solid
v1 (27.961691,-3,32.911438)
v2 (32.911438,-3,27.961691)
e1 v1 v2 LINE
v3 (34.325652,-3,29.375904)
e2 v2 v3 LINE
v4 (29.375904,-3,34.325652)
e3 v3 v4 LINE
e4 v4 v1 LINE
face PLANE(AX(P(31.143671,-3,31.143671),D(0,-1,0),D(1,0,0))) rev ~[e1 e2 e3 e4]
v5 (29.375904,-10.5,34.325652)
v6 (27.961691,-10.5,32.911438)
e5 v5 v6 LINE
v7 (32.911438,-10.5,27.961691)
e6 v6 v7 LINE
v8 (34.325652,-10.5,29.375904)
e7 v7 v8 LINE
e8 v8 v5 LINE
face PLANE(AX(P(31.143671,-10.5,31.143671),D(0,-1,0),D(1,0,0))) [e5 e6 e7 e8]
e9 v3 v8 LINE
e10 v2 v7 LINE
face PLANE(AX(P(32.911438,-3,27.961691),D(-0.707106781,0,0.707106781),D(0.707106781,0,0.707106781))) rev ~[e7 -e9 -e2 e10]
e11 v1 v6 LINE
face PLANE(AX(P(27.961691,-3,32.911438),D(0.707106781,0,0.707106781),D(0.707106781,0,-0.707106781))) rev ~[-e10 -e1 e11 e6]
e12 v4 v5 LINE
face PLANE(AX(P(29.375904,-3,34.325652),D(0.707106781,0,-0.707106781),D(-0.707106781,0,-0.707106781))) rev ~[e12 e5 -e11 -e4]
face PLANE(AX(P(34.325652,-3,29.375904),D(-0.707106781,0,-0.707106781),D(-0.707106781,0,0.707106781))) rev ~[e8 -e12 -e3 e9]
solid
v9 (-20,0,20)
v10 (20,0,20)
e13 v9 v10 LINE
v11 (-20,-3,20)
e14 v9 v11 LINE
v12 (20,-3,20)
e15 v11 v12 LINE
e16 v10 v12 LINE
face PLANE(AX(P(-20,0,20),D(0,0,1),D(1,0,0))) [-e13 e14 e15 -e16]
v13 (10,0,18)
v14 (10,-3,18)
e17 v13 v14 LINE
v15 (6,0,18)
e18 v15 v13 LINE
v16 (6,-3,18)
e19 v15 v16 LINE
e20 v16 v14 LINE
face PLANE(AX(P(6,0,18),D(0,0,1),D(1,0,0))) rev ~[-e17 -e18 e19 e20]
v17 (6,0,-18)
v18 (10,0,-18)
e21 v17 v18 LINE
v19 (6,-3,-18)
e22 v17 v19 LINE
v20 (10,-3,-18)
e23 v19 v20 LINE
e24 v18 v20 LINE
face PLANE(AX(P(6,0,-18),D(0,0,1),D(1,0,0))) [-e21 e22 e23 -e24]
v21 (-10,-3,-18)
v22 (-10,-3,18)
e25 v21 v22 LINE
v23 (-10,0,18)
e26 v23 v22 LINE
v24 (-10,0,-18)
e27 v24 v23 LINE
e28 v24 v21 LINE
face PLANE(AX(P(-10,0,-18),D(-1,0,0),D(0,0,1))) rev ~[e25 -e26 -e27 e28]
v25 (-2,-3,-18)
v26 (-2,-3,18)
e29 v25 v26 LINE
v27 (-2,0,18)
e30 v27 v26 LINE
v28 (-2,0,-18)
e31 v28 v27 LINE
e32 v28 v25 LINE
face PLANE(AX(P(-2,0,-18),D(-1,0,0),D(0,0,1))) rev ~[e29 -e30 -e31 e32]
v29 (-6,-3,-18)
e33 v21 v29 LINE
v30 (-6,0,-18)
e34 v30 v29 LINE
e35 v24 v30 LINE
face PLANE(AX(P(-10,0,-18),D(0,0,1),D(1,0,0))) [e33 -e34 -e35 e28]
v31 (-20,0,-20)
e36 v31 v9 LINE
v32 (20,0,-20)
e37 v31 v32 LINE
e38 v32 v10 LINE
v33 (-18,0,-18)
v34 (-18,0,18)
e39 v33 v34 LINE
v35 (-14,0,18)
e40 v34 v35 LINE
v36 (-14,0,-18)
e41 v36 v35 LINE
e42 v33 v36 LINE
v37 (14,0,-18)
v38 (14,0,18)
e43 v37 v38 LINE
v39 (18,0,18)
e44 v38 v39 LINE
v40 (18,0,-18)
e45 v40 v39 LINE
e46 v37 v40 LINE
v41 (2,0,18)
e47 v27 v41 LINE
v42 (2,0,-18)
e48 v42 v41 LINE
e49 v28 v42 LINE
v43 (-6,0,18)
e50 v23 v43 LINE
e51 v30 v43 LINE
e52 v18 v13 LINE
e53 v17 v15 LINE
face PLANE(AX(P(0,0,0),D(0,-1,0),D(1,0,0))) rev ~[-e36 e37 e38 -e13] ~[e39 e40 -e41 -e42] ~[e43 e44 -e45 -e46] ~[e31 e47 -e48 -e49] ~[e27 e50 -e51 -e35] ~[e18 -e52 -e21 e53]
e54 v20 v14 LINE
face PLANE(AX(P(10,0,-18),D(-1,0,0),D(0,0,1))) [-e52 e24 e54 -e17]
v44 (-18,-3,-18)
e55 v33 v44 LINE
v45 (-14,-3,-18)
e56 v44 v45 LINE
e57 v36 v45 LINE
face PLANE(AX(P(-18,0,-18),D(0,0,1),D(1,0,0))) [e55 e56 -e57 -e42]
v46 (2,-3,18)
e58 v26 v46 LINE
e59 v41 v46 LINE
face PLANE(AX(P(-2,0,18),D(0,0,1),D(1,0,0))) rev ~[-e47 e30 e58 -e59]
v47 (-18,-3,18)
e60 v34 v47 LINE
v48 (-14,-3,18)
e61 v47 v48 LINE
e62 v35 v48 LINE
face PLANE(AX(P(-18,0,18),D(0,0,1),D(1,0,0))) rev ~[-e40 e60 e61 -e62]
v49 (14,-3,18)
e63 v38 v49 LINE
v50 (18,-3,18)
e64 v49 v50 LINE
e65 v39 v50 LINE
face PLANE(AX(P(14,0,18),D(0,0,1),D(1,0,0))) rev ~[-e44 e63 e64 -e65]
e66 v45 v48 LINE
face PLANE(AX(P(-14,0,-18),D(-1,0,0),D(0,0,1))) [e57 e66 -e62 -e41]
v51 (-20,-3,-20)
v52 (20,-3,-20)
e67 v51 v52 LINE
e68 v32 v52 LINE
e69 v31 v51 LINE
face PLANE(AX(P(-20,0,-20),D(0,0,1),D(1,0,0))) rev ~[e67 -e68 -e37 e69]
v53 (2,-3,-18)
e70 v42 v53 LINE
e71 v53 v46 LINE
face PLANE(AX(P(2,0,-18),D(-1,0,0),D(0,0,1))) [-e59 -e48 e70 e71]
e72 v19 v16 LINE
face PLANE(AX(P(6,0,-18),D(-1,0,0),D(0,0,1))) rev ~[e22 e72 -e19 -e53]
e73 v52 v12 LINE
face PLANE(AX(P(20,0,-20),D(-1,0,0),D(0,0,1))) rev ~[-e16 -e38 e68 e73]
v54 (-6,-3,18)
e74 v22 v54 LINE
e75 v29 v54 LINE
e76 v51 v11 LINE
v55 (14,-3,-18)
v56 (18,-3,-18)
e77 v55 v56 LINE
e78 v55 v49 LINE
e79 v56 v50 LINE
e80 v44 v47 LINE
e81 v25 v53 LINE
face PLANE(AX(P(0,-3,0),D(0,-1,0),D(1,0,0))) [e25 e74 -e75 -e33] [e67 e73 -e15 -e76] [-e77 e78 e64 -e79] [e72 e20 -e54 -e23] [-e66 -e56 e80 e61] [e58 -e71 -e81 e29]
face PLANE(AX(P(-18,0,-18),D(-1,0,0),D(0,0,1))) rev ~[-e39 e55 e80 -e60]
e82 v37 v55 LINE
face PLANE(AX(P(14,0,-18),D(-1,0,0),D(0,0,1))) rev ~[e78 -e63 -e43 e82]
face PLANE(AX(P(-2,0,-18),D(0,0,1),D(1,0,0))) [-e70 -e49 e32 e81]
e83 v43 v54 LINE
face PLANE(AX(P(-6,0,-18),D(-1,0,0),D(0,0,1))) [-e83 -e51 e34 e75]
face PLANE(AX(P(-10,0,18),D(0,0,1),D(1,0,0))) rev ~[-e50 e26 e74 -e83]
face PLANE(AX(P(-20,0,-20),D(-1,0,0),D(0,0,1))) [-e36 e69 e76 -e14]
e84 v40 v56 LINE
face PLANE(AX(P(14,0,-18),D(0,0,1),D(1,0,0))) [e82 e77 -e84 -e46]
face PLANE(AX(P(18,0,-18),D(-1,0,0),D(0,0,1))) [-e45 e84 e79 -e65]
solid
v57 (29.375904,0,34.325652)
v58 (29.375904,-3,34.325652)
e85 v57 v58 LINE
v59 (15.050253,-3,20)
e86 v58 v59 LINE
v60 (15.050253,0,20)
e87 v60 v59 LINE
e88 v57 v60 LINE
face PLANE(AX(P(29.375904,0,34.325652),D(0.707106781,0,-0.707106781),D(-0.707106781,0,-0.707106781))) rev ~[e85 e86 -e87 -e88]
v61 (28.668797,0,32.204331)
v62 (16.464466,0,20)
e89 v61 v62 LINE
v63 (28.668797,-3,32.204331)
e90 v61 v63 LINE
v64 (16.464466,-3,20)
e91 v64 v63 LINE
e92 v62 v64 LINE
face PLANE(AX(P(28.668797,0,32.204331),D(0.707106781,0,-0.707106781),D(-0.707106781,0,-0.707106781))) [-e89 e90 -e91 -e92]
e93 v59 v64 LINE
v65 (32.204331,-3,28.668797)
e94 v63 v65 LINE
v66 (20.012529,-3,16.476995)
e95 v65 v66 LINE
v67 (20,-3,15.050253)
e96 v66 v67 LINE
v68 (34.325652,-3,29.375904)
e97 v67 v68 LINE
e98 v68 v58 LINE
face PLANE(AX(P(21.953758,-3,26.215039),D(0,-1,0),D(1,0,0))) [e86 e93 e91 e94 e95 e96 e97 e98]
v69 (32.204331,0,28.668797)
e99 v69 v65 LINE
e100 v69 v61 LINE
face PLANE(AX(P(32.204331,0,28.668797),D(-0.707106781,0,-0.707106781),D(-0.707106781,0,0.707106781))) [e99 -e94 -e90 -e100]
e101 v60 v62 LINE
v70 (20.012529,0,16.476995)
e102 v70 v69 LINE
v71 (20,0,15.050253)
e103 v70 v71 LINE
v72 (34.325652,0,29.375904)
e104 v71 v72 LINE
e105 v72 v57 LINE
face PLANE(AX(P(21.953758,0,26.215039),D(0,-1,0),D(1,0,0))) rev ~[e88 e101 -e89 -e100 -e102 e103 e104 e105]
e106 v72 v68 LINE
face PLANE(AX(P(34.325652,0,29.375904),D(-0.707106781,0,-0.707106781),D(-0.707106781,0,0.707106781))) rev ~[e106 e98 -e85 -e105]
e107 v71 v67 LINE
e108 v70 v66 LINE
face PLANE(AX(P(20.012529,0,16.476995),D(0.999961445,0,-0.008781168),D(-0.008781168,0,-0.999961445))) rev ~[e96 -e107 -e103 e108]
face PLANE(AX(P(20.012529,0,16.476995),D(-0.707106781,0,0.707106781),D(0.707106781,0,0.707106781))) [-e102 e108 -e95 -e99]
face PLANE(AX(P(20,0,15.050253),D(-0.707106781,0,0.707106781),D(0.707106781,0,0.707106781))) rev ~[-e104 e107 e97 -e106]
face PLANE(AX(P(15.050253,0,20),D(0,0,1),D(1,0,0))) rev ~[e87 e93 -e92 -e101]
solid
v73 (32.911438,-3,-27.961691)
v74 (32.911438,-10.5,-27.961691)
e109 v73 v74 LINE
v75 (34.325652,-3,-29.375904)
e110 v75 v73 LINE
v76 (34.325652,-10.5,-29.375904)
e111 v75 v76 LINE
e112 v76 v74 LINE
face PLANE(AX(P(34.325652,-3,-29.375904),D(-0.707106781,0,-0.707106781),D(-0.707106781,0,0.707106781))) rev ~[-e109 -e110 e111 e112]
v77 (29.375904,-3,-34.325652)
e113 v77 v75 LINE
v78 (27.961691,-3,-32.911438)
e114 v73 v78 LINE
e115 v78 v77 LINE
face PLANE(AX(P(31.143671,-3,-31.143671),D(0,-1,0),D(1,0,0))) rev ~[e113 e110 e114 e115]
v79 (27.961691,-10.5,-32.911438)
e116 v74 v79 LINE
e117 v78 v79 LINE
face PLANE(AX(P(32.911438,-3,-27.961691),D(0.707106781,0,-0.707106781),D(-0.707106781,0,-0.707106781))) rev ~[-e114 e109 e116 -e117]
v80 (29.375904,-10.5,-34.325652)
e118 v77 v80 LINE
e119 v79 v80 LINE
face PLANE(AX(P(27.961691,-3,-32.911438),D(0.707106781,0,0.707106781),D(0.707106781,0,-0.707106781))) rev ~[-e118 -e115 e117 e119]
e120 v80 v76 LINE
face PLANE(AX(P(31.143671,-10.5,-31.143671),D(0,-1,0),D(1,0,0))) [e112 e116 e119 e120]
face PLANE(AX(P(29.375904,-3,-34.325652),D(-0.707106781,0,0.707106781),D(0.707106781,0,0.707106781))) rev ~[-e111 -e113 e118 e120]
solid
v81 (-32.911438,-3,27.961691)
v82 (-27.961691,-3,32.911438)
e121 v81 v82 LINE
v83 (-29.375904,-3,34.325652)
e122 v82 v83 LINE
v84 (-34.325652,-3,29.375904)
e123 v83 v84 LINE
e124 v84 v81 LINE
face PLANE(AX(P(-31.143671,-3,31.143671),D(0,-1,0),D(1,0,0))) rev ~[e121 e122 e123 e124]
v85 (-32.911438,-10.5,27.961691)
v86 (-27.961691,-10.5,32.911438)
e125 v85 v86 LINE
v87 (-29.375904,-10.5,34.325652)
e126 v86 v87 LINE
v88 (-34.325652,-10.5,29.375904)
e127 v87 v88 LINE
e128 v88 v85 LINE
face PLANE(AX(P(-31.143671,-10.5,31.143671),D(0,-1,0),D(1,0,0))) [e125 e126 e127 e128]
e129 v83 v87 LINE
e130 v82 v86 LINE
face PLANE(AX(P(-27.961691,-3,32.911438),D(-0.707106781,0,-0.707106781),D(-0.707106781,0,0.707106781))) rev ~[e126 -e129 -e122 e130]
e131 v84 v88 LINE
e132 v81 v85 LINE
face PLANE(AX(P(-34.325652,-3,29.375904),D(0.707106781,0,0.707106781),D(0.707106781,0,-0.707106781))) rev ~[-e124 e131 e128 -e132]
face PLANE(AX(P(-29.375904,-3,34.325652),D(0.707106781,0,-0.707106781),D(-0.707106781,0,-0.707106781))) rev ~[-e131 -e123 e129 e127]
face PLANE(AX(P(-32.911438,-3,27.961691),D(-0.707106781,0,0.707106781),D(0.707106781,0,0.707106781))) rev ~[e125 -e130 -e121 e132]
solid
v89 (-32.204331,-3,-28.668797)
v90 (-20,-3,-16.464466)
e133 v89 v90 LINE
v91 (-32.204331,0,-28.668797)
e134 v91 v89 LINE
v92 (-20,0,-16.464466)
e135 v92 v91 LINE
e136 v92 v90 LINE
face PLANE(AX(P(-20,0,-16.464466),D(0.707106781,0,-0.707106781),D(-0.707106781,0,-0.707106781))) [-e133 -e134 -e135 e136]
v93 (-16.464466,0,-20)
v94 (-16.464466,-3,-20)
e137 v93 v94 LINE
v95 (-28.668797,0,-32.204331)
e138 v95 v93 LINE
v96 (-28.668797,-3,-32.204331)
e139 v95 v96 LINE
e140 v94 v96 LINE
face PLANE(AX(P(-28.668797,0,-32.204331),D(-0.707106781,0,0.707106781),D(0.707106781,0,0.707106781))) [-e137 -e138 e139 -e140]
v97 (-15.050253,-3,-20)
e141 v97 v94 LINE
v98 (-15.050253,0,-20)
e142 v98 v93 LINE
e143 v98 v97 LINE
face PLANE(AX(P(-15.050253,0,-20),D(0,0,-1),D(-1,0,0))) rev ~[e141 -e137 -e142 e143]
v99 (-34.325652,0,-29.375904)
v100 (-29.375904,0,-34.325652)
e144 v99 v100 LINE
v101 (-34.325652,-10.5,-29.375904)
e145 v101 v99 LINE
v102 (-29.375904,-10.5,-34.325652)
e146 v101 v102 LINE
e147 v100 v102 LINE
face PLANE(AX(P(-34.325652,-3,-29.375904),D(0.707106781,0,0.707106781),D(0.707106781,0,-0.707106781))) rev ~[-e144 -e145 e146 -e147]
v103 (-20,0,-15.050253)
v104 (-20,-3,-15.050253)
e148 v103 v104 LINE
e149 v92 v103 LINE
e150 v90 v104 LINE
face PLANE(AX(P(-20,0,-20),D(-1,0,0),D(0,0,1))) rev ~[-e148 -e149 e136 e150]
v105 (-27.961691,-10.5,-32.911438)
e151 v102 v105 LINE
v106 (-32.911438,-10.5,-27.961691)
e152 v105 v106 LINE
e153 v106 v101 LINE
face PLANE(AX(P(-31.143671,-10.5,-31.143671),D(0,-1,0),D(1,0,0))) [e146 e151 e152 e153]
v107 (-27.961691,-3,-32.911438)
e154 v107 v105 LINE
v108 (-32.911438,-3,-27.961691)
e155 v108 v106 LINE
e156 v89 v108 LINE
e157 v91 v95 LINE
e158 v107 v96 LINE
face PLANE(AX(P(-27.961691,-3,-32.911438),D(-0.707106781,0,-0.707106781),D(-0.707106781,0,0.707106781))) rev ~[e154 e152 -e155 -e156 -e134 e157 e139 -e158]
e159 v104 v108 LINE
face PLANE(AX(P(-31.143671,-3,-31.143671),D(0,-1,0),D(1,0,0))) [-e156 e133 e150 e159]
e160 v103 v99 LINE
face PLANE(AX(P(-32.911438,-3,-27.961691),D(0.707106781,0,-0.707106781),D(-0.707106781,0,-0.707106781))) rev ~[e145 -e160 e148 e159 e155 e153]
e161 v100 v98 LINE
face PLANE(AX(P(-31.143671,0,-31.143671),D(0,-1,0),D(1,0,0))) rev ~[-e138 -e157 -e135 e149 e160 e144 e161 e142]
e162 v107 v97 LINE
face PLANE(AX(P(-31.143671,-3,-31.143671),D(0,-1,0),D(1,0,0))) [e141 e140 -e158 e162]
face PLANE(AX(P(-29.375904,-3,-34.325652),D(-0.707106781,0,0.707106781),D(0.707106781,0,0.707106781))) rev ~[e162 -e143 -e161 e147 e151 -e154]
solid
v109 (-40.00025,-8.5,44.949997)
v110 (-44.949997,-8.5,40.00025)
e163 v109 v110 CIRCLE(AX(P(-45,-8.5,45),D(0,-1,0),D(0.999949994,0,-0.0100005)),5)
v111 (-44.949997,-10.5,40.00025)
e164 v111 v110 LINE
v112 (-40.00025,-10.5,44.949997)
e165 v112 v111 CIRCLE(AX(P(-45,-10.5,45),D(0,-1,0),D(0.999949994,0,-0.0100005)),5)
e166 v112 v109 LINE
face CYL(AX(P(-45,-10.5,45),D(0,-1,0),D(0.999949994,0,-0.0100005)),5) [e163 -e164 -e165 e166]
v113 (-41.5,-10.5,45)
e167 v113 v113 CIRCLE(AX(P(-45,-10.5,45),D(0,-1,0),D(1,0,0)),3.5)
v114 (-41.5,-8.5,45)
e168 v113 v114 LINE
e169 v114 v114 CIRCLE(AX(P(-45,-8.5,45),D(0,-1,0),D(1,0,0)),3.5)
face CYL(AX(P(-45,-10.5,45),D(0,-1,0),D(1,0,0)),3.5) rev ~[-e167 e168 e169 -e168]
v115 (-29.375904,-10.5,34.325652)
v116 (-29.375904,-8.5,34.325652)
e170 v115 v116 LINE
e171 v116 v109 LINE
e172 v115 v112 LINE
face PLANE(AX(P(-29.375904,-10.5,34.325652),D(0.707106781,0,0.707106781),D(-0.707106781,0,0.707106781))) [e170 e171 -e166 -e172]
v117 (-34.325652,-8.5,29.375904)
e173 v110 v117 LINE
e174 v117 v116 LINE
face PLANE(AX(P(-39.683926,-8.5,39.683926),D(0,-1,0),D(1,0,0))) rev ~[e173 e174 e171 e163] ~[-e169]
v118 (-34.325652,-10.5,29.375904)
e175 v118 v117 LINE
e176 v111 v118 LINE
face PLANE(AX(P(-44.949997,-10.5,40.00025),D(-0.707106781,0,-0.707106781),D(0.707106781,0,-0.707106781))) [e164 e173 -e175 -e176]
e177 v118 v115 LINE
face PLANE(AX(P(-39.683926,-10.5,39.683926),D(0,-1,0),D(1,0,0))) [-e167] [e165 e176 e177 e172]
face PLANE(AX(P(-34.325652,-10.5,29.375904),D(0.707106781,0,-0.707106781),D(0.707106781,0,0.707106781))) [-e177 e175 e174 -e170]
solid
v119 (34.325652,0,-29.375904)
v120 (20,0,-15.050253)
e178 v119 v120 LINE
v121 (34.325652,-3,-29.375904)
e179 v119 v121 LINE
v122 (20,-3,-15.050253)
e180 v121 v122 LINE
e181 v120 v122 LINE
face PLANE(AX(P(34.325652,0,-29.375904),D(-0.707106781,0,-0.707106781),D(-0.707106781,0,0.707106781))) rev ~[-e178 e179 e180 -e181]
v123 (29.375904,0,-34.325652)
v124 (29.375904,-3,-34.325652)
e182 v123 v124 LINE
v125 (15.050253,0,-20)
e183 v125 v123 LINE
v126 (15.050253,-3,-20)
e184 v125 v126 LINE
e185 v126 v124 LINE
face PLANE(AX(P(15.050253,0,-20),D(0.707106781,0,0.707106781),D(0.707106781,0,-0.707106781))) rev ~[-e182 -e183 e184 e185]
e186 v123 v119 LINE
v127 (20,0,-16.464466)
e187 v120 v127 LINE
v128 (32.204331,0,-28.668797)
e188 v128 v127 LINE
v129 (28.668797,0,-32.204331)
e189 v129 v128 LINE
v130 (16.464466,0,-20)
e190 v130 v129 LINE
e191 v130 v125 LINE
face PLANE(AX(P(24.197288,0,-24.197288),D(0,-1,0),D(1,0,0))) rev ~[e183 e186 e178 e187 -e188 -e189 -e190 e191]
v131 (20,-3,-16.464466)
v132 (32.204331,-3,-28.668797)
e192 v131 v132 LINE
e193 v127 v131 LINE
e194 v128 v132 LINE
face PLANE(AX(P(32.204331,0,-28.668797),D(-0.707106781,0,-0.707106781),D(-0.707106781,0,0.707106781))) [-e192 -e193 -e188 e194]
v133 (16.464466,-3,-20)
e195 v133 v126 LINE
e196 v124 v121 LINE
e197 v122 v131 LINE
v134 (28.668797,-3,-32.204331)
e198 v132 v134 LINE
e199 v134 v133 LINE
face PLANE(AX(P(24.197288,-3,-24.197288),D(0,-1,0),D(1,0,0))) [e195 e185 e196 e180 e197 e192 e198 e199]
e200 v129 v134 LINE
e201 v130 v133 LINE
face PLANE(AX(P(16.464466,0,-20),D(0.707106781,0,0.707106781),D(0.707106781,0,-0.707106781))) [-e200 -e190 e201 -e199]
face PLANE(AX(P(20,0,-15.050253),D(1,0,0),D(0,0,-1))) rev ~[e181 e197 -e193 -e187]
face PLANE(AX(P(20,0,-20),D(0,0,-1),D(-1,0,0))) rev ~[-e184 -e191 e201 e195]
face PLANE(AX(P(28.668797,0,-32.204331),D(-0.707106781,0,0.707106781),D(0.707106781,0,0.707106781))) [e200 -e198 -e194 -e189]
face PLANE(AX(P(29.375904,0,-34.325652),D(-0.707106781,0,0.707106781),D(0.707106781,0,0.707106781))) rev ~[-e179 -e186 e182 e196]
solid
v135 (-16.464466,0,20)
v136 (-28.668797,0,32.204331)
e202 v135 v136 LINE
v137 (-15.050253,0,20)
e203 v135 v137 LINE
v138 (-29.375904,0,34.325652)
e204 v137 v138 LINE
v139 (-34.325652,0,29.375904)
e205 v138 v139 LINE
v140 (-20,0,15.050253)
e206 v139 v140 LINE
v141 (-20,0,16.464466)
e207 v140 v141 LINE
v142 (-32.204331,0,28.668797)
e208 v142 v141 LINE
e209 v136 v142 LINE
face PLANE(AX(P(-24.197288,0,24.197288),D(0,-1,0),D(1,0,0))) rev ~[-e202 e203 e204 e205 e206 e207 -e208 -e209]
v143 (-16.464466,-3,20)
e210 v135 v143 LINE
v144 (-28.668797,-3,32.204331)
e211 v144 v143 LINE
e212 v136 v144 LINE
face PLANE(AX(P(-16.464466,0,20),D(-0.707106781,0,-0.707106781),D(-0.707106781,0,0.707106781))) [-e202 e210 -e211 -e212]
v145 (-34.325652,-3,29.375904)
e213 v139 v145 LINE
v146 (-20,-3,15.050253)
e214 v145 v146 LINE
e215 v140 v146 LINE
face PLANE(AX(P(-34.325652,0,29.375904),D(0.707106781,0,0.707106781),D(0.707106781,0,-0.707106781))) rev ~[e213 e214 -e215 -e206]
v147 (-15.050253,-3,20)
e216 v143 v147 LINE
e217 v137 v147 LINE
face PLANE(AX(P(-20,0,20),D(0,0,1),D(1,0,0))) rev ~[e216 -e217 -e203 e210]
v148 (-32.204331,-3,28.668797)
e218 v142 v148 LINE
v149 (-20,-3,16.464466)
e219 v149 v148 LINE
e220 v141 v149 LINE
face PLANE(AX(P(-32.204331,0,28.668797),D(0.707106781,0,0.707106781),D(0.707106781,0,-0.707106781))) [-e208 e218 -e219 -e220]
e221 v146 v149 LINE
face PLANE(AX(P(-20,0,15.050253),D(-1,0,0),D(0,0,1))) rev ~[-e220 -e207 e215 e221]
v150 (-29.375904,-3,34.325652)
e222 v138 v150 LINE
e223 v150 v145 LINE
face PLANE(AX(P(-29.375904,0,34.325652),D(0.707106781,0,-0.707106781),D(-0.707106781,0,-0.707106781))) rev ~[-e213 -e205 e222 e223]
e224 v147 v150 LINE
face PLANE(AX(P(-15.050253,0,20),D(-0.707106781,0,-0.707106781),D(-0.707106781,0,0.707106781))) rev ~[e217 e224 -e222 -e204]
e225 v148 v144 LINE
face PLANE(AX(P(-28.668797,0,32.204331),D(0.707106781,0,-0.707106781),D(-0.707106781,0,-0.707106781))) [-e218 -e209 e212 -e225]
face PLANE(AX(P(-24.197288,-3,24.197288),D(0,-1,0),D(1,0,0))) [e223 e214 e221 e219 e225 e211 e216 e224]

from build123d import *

# Parameters (mm, degrees)
F0_W      = 40
F0_H      = 40
F0_W_2    = 4
F0_H_2    = 36
F1_DEPTH  = 3
F3_DEPTH  = 3
F4_DEPTH  = 25
F5_DEPTH  = 25
F6_DEPTH  = 25
F7_DEPTH  = 25
F9_DEPTH  = 7.5
F10_R     = 3.5
F11_DEPTH = 2


# Not quite as in the source:
# - the program builds the solid bodies; features that only make, move or delete a surface that nothing else refers to are left out


with BuildPart() as f1:
    # F0 (on Front) → F1 (new body)
    with BuildSketch(Plane.XZ):
        Rectangle(F0_W, F0_H)
        with Locations((-16, 0)):
            Rectangle(F0_W_2, F0_H_2, mode=Mode.SUBTRACT)
        with Locations((-8, 0)):
            Rectangle(F0_W_2, F0_H_2, mode=Mode.SUBTRACT)
        Rectangle(F0_W_2, F0_H_2, mode=Mode.SUBTRACT)
        with Locations((8, 0)):
            Rectangle(F0_W_2, F0_H_2, mode=Mode.SUBTRACT)
        with Locations((16, 0)):
            Rectangle(F0_W_2, F0_H_2, mode=Mode.SUBTRACT)
    extrude(amount=F1_DEPTH)


with BuildPart() as f3:
    # F2 (on Front) → F3 (new body)
    with BuildSketch(Plane.XZ):
        Polygon((27.9616906966, 32.9114381649), (15.0502525317, 20), (16.4644660941, 20), (28.6687974778, 32.2043313837), align=None)
        Polygon((29.3759042589, 34.3256517272), (27.9616906966, 32.9114381649), (28.6687974778, 32.2043313837), (32.2043313837, 28.6687974778), (32.9114381649, 27.9616906966), (34.3256517272, 29.3759042589), align=None)
        Polygon((28.6687974778, 32.2043313837), (16.4644660941, 20), (20.0434662402, 20), (20.0125289488, 16.4769950429), (32.2043313837, 28.6687974778), align=None)
        Polygon((32.9114381649, 27.9616906966), (32.2043313837, 28.6687974778), (20.0125289488, 16.4769950429), (20, 15.0502525317), align=None)
    extrude(amount=F3_DEPTH)

    # F2 (on Front) → F4 (cut)
    with BuildSketch(Plane.XZ):
        Polygon((28.6687974778, 32.2043313837), (16.4644660941, 20), (20.0434662402, 20), (20.0125289488, 16.4769950429), (32.2043313837, 28.6687974778), align=None)
    extrude(amount=F4_DEPTH, mode=Mode.SUBTRACT)


with BuildPart() as f3b:
    # F2 (on Front) → F3, piece 2 (new body)
    with BuildSketch(Plane.XZ):
        Polygon((-16.4644660941, 20), (-28.6687974778, 32.2043313837), (-32.2043313837, 28.6687974778), (-20, 16.4644660941), (-20, 20), align=None)
        Polygon((-27.9616906966, 32.9114381649), (-28.6687974778, 32.2043313837), (-16.4644660941, 20), (-15.0502525317, 20), align=None)
        Polygon((-32.2043313837, 28.6687974778), (-28.6687974778, 32.2043313837), (-27.9616906966, 32.9114381649), (-29.3759042589, 34.3256517272), (-34.3256517272, 29.3759042589), (-32.9114381649, 27.9616906966), align=None)
        Polygon((-20, 16.4644660941), (-32.2043313837, 28.6687974778), (-32.9114381649, 27.9616906966), (-20, 15.0502525317), align=None)
    extrude(amount=F3_DEPTH)

    # F2 (on Front) → F5 (cut)
    with BuildSketch(Plane.XZ):
        Polygon((-16.4644660941, 20), (-28.6687974778, 32.2043313837), (-32.2043313837, 28.6687974778), (-20, 16.4644660941), (-20, 20), align=None)
    extrude(amount=F5_DEPTH, mode=Mode.SUBTRACT)


with BuildPart() as f3c:
    # F2 (on Front) → F3, piece 3 (new body)
    with BuildSketch(Plane.XZ):
        Polygon((-27.9616906966, -32.9114381649), (-28.6687974778, -32.2043313837), (-32.2043313837, -28.6687974778), (-32.9114381649, -27.9616906966), (-34.3256517272, -29.3759042589), (-29.3759042589, -34.3256517272), align=None)
        Polygon((-32.2043313837, -28.6687974778), (-28.6687974778, -32.2043313837), (-16.4644660941, -20), (-20, -20), (-20, -16.4644660941), align=None)
        Polygon((-16.4644660941, -20), (-28.6687974778, -32.2043313837), (-27.9616906966, -32.9114381649), (-15.0502525317, -20), align=None)
        Polygon((-32.9114381649, -27.9616906966), (-32.2043313837, -28.6687974778), (-20, -16.4644660941), (-20, -15.0502525317), align=None)
    extrude(amount=F3_DEPTH)

    # F2 (on Front) → F7 (cut)
    with BuildSketch(Plane.XZ):
        Polygon((-32.2043313837, -28.6687974778), (-28.6687974778, -32.2043313837), (-16.4644660941, -20), (-20, -20), (-20, -16.4644660941), align=None)
    extrude(amount=F7_DEPTH, mode=Mode.SUBTRACT)

    # F8 (on face) → F9 (join)
    with BuildSketch(Plane.XZ.offset(3)):
        Polygon((-34.3256517272, -29.3759042589), (-29.3759042589, -34.3256517272), (-27.9616906966, -32.9114381649), (-28.6687974778, -32.2043313837), (-32.2043313837, -28.6687974778), (-32.9114381649, -27.9616906966), align=None)
    extrude(amount=F9_DEPTH)


with BuildPart() as f3d:
    # F2 (on Front) → F3, piece 4 (new body)
    with BuildSketch(Plane.XZ):
        Polygon((16.4644660941, -20), (28.6687974778, -32.2043313837), (32.2043313837, -28.6687974778), (20, -16.4644660941), (20, -20), align=None)
        Polygon((27.9616906966, -32.9114381649), (28.6687974778, -32.2043313837), (16.4644660941, -20), (15.0502525317, -20), align=None)
        Polygon((32.2043313837, -28.6687974778), (28.6687974778, -32.2043313837), (27.9616906966, -32.9114381649), (29.3759042589, -34.3256517272), (34.3256517272, -29.3759042589), (32.9114381649, -27.9616906966), align=None)
        Polygon((20, -16.4644660941), (32.2043313837, -28.6687974778), (32.9114381649, -27.9616906966), (20, -15.0502525317), align=None)
    extrude(amount=F3_DEPTH)

    # F2 (on Front) → F6 (cut)
    with BuildSketch(Plane.XZ):
        Polygon((16.4644660941, -20), (28.6687974778, -32.2043313837), (32.2043313837, -28.6687974778), (20, -16.4644660941), (20, -20), align=None)
    extrude(amount=F6_DEPTH, mode=Mode.SUBTRACT)


with BuildPart() as f9:
    # F8 (on face) → F9, piece 2 (new body)
    with BuildSketch(Plane.XZ.offset(3)):
        Polygon((32.2043313837, -28.6687974778), (28.6687974778, -32.2043313837), (27.9616906966, -32.9114381649), (29.3759042589, -34.3256517272), (34.3256517272, -29.3759042589), (32.9114381649, -27.9616906966), align=None)
    extrude(amount=F9_DEPTH)


with BuildPart() as f9b:
    # F8 (on face) → F9, piece 3 (new body)
    with BuildSketch(Plane.XZ.offset(3)):
        Polygon((-27.9616906966, 32.9114381649), (-29.3759042589, 34.3256517272), (-34.3256517272, 29.3759042589), (-32.9114381649, 27.9616906966), (-32.2043313837, 28.6687974778), (-28.6687974778, 32.2043313837), align=None)
    extrude(amount=F9_DEPTH)


with BuildPart() as f9c:
    # F8 (on face) → F9, piece 4 (new body)
    with BuildSketch(Plane.XZ.offset(3)):
        Polygon((34.3256517272, 29.3759042589), (29.3759042589, 34.3256517272), (27.9616906966, 32.9114381649), (28.6687974778, 32.2043313837), (32.2043313837, 28.6687974778), (32.9114381649, 27.9616906966), align=None)
    extrude(amount=F9_DEPTH)


with BuildPart() as f11:
    # F10 (on face) → F11 (new body)
    with BuildSketch(Plane.XZ.offset(10.5)):
        with BuildLine():
            Line((-34.3256517272, 29.3759042589), (-29.3759042589, 34.3256517272))
            Line((-29.3759042589, 34.3256517272), (-40.0002500313, 44.9499974996))
            ThreePointArc((-40.0002500313, 44.9499974996), (-48.5355339059, 48.5355339059), (-44.9499974996, 40.0002500313))
            Line((-44.9499974996, 40.0002500313), (-34.3256517272, 29.3759042589))
        make_face()
        with Locations((-45, 45)):
            Circle(F10_R, mode=Mode.SUBTRACT)
    extrude(amount=-F11_DEPTH)


solid = Compound([f1.part, f3.part, f3b.part, f3c.part, f3d.part, f9.part, f9b.part, f9c.part, f11.part])
